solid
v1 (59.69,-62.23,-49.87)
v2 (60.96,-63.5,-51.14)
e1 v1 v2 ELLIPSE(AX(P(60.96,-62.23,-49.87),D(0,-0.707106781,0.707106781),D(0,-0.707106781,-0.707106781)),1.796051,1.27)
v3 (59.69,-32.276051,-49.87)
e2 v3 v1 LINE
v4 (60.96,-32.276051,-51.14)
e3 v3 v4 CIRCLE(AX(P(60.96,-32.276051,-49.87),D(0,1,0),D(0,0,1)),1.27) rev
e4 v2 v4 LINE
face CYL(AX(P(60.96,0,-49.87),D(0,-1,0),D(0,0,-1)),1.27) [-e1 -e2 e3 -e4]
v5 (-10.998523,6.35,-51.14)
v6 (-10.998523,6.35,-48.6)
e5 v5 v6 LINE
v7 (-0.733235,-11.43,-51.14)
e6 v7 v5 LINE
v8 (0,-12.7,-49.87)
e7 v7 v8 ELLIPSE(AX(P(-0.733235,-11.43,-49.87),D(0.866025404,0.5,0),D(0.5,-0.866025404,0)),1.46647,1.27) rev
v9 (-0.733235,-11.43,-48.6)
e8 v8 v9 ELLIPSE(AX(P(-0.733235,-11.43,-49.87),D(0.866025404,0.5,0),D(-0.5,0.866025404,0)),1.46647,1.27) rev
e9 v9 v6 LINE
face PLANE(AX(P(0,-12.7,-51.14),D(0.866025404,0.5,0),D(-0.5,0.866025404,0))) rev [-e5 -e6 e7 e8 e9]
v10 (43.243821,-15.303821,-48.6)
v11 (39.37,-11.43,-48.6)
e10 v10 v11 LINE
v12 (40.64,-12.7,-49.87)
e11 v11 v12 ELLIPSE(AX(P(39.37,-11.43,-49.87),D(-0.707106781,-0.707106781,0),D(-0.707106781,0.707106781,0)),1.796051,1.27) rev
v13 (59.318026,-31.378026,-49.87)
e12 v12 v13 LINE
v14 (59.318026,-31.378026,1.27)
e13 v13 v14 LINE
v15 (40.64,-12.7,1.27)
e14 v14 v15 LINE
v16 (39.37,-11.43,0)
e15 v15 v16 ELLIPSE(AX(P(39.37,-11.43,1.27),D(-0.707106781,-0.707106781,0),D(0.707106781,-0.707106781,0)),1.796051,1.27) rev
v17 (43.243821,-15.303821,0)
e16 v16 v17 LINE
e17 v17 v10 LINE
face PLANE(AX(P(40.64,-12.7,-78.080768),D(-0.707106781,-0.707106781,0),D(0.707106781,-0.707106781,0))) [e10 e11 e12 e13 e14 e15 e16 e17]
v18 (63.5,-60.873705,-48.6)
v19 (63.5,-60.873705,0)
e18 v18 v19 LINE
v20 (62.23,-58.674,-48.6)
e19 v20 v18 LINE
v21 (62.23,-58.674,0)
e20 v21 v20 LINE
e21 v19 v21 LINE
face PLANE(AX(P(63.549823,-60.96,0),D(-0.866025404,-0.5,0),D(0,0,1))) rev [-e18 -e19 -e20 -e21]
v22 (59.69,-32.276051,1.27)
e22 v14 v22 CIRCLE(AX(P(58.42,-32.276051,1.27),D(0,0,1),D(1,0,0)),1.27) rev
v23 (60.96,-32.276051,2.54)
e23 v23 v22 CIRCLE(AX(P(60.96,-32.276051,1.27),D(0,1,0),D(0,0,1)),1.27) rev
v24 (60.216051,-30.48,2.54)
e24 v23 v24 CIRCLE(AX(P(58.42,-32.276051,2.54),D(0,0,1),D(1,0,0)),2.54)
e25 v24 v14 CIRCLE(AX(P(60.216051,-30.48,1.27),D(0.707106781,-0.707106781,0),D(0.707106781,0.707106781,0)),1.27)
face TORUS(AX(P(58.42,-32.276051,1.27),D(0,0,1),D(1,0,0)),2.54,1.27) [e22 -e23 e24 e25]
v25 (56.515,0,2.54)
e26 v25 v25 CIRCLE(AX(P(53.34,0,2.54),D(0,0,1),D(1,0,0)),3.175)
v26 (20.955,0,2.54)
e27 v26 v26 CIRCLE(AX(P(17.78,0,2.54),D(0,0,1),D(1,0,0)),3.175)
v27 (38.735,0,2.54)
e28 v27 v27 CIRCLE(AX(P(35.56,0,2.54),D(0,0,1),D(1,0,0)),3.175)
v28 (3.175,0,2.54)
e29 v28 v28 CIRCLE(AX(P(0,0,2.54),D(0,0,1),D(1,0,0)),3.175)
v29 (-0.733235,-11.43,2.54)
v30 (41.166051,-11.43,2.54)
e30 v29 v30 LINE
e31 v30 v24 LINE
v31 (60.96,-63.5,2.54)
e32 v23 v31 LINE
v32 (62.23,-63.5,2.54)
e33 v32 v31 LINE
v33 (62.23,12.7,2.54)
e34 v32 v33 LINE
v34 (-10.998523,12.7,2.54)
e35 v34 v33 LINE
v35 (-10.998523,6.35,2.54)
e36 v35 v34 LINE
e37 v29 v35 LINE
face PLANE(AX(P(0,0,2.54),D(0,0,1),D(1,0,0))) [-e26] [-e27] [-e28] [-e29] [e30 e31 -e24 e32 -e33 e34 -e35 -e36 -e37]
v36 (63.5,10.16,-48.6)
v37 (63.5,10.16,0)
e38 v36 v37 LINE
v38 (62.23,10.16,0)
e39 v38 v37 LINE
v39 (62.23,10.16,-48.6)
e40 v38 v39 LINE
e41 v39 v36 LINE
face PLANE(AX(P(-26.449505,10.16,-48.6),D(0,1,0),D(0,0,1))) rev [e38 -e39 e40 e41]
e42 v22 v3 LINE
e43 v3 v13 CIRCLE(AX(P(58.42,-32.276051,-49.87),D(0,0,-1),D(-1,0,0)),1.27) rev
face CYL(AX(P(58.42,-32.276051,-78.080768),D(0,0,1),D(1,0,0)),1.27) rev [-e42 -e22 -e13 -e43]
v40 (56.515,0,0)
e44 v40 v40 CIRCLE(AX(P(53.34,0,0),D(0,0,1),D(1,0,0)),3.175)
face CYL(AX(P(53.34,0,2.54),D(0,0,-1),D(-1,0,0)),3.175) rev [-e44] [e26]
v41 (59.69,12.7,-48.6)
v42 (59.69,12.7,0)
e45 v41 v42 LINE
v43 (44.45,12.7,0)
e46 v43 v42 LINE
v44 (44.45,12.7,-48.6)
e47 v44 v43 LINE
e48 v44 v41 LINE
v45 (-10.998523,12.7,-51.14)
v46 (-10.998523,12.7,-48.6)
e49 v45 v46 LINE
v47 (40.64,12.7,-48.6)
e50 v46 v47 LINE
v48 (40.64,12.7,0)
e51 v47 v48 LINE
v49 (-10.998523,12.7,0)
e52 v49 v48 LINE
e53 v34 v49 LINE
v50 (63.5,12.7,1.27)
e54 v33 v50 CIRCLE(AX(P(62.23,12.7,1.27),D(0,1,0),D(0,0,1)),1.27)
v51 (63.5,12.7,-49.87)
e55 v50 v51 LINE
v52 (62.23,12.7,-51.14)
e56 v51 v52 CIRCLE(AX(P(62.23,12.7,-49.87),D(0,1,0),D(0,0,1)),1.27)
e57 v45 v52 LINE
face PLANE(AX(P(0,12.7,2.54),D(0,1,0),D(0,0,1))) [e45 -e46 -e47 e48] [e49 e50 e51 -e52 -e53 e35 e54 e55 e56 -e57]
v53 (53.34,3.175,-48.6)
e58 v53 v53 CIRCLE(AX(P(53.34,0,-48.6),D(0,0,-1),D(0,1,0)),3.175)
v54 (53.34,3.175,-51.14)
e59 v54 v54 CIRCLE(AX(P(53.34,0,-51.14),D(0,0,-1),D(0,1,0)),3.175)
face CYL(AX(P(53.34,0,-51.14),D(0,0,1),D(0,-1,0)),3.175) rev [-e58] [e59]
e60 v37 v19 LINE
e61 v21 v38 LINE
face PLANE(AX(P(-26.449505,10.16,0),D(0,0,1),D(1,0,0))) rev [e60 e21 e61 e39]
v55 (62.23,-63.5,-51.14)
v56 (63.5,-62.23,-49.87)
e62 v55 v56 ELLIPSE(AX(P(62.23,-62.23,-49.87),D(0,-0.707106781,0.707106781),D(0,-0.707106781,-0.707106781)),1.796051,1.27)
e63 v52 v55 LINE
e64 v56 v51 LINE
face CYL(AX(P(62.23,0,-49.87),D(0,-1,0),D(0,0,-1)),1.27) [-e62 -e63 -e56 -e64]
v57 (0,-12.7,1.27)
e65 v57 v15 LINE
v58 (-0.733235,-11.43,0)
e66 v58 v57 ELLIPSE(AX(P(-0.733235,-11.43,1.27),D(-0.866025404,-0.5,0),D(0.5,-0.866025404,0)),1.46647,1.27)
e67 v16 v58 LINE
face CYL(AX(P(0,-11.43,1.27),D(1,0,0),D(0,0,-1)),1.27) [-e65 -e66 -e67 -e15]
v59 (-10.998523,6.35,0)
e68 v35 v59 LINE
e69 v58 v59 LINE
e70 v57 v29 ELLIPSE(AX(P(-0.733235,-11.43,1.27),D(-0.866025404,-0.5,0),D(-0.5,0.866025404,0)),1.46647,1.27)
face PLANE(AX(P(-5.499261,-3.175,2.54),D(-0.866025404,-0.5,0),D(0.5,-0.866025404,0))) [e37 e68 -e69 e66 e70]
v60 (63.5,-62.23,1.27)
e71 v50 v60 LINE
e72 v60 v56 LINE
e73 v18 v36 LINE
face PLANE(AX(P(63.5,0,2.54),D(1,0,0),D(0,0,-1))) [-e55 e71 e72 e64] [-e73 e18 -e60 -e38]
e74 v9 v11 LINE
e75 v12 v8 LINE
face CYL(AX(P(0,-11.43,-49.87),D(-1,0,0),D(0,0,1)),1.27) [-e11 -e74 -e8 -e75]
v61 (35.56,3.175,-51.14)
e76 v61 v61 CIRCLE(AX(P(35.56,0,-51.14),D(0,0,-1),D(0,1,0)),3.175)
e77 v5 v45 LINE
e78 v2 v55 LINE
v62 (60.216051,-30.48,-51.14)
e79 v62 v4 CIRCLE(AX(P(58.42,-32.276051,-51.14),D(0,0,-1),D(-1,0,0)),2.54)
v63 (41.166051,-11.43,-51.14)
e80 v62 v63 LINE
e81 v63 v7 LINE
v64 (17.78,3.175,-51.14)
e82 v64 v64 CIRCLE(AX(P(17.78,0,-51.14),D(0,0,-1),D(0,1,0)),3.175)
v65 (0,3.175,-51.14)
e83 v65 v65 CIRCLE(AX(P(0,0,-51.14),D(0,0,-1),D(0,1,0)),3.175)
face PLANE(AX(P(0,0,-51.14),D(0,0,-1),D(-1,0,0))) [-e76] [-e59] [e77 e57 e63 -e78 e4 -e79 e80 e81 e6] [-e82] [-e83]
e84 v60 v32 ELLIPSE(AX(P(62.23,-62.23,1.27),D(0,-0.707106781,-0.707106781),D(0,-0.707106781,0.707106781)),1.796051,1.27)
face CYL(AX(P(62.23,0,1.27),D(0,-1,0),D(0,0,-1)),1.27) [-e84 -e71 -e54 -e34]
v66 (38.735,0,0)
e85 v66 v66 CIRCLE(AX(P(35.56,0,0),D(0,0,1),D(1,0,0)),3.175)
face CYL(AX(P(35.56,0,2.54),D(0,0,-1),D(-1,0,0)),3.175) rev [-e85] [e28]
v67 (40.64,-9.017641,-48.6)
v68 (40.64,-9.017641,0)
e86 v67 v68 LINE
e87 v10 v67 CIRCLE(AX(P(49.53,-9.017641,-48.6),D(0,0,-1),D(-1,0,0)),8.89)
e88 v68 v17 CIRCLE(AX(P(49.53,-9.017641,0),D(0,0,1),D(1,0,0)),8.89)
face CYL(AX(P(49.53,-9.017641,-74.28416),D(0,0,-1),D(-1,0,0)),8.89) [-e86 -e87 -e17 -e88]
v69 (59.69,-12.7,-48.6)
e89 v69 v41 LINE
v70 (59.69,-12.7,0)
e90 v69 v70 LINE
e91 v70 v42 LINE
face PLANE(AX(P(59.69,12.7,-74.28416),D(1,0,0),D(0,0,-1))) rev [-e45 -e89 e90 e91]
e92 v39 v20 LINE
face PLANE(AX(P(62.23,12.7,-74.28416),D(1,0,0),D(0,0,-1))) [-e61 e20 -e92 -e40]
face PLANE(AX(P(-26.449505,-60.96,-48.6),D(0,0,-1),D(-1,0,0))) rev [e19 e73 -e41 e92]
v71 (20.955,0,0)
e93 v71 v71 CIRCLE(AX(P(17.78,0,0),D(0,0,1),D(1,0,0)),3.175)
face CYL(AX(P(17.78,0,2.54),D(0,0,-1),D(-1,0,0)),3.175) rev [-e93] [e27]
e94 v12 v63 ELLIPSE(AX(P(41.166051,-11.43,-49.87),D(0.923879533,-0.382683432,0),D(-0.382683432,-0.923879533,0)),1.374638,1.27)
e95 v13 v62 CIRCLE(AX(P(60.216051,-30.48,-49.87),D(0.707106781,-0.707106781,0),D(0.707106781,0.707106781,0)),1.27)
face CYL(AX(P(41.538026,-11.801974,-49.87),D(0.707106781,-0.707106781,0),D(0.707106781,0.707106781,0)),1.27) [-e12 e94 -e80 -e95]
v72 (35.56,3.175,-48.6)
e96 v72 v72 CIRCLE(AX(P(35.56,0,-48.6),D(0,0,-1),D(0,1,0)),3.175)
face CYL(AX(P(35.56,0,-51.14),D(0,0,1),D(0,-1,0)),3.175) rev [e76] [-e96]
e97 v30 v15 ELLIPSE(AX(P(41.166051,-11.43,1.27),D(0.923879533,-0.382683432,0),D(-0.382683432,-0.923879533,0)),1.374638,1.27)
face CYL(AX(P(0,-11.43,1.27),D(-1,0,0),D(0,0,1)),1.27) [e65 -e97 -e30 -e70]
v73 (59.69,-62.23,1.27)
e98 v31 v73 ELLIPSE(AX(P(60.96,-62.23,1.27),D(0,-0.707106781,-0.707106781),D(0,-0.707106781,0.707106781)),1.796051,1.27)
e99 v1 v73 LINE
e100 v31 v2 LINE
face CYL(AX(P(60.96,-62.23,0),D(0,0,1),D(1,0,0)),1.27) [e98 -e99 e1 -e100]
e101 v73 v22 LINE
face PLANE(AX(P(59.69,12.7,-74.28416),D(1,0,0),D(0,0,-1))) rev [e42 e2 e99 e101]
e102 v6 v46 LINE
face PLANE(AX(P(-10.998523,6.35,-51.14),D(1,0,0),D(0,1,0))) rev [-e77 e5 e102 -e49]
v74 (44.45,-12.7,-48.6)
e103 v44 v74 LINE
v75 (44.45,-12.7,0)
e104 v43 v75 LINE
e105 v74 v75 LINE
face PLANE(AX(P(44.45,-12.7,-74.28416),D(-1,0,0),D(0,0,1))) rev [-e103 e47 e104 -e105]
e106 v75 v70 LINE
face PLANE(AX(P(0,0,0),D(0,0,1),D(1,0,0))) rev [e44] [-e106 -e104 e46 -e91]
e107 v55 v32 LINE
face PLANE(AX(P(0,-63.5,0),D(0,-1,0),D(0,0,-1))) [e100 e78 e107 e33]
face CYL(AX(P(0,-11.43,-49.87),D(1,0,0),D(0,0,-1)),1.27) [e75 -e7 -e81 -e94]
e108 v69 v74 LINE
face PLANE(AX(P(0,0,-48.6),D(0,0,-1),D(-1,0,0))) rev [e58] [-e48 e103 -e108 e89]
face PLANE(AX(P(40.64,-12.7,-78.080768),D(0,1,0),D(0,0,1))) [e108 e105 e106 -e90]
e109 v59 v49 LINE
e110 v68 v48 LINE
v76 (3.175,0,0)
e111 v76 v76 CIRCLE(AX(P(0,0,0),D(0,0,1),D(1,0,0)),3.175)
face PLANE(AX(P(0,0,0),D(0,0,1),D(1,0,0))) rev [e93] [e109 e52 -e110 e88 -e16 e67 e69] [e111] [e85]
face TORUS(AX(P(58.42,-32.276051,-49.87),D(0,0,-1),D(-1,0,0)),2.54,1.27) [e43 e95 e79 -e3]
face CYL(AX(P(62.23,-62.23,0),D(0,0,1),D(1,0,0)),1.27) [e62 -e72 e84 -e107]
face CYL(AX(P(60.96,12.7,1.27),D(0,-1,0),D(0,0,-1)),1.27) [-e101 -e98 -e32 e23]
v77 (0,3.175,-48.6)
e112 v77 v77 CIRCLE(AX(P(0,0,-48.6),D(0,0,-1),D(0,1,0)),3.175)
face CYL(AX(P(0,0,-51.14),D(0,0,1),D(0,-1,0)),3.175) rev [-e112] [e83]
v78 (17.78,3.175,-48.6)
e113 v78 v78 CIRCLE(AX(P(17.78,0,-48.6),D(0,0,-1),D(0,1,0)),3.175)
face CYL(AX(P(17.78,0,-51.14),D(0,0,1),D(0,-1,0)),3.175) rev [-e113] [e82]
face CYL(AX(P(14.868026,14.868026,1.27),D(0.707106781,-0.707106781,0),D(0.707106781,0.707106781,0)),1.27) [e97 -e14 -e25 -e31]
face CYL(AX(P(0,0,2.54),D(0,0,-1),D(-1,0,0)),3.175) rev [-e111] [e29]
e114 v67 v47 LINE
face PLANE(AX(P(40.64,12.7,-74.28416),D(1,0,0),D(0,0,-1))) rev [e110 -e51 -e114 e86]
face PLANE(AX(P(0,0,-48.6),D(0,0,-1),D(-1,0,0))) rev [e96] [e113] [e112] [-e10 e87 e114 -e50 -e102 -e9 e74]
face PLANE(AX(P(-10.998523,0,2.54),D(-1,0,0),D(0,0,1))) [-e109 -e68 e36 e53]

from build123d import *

# Parameters (mm, degrees)
SKETCH2_R           = 3.175
BOSS_EXTRUDE1_DEPTH = 2.54
SKETCH3_R           = 3.175
BOSS_EXTRUDE2_DEPTH = 2.54
SKETCH4_W           = 3.81
SKETCH4_H           = 25.4
BOSS_EXTRUDE3_DEPTH = 48.6
BOSS_EXTRUDE4_DEPTH = 50.8
LPATTERN1_COUNT     = 2
LPATTERN1_PITCH     = 19.05
SKETCH6_W           = 48.6
SKETCH6_H           = 71.12
CUT_EXTRUDE1_DEPTH  = 1.27
BOSS_EXTRUDE5_REACH = 106.623
FILLET1_R           = 8.89
FILLET2_R           = 1.27
CHAMFER1_SIZE       = 2.286
CHAMFER1_SIZE_2     = 1.319822715


# Some blends are built 0.0001 mm under size
with BuildPart() as part:
    # Sketch2 → Boss-Extrude1 (new body)
    with BuildSketch(Plane.XY):
        Polygon((0, -12.7), (63.5, -12.7), (63.5, 12.7), (0, 12.7), (-10.998522628, 12.7), (-10.998522628, 6.35), align=None)
        Circle(SKETCH2_R, mode=Mode.SUBTRACT)
        with Locations((17.78, 0)):
            Circle(SKETCH2_R, mode=Mode.SUBTRACT)
        with Locations((35.56, 0)):
            Circle(SKETCH2_R, mode=Mode.SUBTRACT)
        with Locations((53.34, 0)):
            Circle(SKETCH2_R, mode=Mode.SUBTRACT)
    extrude(amount=BOSS_EXTRUDE1_DEPTH)



with BuildPart() as body_2:
    # Sketch3 → Boss-Extrude2 (new body)
    with BuildSketch(Plane(origin=(0, 0, -48.6), x_dir=(-1, 0, 0), z_dir=(0, 0, -1))):
        Polygon((10.998522628, 12.7), (-63.5, 12.7), (-63.5, -12.7), (0, -12.7), (10.998522628, 6.35), align=None)
        with Locations(Location((0, 0, 0), (0, 0, 180))):
            Circle(SKETCH3_R, mode=Mode.SUBTRACT)
        with Locations(Location((-53.34, 0, 0), (0, 0, 180))):
            Circle(SKETCH3_R, mode=Mode.SUBTRACT)
        with Locations(Location((-35.56, 0, 0), (0, 0, 180))):
            Circle(SKETCH3_R, mode=Mode.SUBTRACT)
        with Locations(Location((-17.78, 0, 0), (0, 0, 180))):
            Circle(SKETCH3_R, mode=Mode.SUBTRACT)
    extrude(amount=BOSS_EXTRUDE2_DEPTH)


with BuildPart() as part_1:
    add(part.part)

    add(body_2.part)  # Boss-Extrude3 merges body 2
    # Sketch4 → Boss-Extrude3 (add)
    with BuildSketch(Plane(origin=(0, 0, 0), x_dir=(-1, 0, 0), z_dir=(0, 0, -1))):
        with Locations((-61.595, 0)):
            Rectangle(SKETCH4_W, SKETCH4_H)
    boss_extrude3 = extrude(amount=BOSS_EXTRUDE3_DEPTH)

    # Sketch5 → Boss-Extrude4 (add)
    with BuildSketch(Plane.XZ.offset(12.7)):
        Polygon((59.69, -48.6), (59.69, 0), (59.69, 2.54), (63.5, 2.54), (63.5, -51.14), (59.69, -51.14), align=None)
    extrude(amount=BOSS_EXTRUDE4_DEPTH)

    # LPattern1: Boss-Extrude3 ×2
    with Locations(*[(-i * LPATTERN1_PITCH, 0, 0) for i in range(1, LPATTERN1_COUNT)]):
        add(boss_extrude3)

    # Sketch6 → Cut-Extrude1 (cut)
    with BuildSketch(Plane(origin=(63.5, 0, 0), x_dir=(0, 0, -1), z_dir=(1, 0, 0))):
        with Locations((24.3, -25.4)):
            Rectangle(SKETCH6_W, SKETCH6_H)
    extrude(amount=-CUT_EXTRUDE1_DEPTH, mode=Mode.SUBTRACT)

    # Boss-Extrude5: up to this face of the body (flat: up to its plane)
    boss_extrude5_end = Plane(part_1.part.faces().sort_by_distance((31.808357107, -3.617906471, -51.14))[0])
    # Sketch7 → Boss-Extrude5 (add, up to the picked face)
    with BuildSketch(Plane.XY.offset(2.54), mode=Mode.PRIVATE) as boss_extrude5_sk1:
        Polygon((40.64, -12.7), (59.69, -31.75), (59.69, -12.7), align=None)
    boss_extrude5_tool1 = split(extrude(boss_extrude5_sk1.sketch, amount=-BOSS_EXTRUDE5_REACH, mode=Mode.PRIVATE), bisect_by=boss_extrude5_end, keep=Keep.BOTH, mode=Mode.PRIVATE)
    add(boss_extrude5_tool1.solids().sort_by(Axis((53.34, -19.05, 2.54), (0, 0, -1)))[0])

    # Fillet1
    fillet1_edges = [part_1.edges().sort_by_distance(p)[0] for p in [
        (40.64, -12.7, -24.3),
    ]]
    fillet(fillet1_edges, radius=FILLET1_R)

    # Fillet2
    fillet2_edges = [part_1.edges().sort_by_distance(p)[0] for p in [
        (20.32, -12.7, -51.14),
        (50.165, -22.225, 2.54),
        (50.165, -22.225, -51.14),
        (59.69, -31.75, -24.3),
        (20.32, -12.7, 0),
        (20.32, -12.7, 2.54),
        (63.5, -25.4, 2.54),
        (63.5, -25.4, -51.14),
        (59.69, -47.625, -51.14),
        (59.69, -47.625, 2.54),
        (59.69, -63.5, -24.3),
        (63.5, -63.5, -24.3),
        (20.32, -12.7, -48.6),
    ]]
    fillet(fillet2_edges, radius=FILLET2_R - 0.0001)  # a hair under: the kernel refuses the full size

    # Chamfer1
    # the kernel refuses this chamfer: 2.286, 1.319822715 mm, written as the material it adds along each edge
    with BuildSketch(Plane(origin=(62.23, -60.96, 0), x_dir=(-0.01932676561270189, 0.9998132206222078, 0), z_dir=(0, 0, -1))) as chamfer1_piece_1_section:
        Polygon((CHAMFER1_SIZE * 0.999813220622, CHAMFER1_SIZE * 0.0193267656127), (-CHAMFER1_SIZE_2 * 0.0193267656181, CHAMFER1_SIZE_2 * 0.999813220901), (0, 0), align=None)
    chamfer1_piece_1 = extrude(amount=48.6, mode=Mode.PRIVATE)
    chamfer1_piece_1 = split(chamfer1_piece_1, bisect_by=Plane(origin=(63.5, -60.18781376, -24.3), z_dir=(-1, 0, 0)), keep=Keep.TOP, mode=Mode.PRIVATE)
    add(chamfer1_piece_1)


solid = part_1.part
